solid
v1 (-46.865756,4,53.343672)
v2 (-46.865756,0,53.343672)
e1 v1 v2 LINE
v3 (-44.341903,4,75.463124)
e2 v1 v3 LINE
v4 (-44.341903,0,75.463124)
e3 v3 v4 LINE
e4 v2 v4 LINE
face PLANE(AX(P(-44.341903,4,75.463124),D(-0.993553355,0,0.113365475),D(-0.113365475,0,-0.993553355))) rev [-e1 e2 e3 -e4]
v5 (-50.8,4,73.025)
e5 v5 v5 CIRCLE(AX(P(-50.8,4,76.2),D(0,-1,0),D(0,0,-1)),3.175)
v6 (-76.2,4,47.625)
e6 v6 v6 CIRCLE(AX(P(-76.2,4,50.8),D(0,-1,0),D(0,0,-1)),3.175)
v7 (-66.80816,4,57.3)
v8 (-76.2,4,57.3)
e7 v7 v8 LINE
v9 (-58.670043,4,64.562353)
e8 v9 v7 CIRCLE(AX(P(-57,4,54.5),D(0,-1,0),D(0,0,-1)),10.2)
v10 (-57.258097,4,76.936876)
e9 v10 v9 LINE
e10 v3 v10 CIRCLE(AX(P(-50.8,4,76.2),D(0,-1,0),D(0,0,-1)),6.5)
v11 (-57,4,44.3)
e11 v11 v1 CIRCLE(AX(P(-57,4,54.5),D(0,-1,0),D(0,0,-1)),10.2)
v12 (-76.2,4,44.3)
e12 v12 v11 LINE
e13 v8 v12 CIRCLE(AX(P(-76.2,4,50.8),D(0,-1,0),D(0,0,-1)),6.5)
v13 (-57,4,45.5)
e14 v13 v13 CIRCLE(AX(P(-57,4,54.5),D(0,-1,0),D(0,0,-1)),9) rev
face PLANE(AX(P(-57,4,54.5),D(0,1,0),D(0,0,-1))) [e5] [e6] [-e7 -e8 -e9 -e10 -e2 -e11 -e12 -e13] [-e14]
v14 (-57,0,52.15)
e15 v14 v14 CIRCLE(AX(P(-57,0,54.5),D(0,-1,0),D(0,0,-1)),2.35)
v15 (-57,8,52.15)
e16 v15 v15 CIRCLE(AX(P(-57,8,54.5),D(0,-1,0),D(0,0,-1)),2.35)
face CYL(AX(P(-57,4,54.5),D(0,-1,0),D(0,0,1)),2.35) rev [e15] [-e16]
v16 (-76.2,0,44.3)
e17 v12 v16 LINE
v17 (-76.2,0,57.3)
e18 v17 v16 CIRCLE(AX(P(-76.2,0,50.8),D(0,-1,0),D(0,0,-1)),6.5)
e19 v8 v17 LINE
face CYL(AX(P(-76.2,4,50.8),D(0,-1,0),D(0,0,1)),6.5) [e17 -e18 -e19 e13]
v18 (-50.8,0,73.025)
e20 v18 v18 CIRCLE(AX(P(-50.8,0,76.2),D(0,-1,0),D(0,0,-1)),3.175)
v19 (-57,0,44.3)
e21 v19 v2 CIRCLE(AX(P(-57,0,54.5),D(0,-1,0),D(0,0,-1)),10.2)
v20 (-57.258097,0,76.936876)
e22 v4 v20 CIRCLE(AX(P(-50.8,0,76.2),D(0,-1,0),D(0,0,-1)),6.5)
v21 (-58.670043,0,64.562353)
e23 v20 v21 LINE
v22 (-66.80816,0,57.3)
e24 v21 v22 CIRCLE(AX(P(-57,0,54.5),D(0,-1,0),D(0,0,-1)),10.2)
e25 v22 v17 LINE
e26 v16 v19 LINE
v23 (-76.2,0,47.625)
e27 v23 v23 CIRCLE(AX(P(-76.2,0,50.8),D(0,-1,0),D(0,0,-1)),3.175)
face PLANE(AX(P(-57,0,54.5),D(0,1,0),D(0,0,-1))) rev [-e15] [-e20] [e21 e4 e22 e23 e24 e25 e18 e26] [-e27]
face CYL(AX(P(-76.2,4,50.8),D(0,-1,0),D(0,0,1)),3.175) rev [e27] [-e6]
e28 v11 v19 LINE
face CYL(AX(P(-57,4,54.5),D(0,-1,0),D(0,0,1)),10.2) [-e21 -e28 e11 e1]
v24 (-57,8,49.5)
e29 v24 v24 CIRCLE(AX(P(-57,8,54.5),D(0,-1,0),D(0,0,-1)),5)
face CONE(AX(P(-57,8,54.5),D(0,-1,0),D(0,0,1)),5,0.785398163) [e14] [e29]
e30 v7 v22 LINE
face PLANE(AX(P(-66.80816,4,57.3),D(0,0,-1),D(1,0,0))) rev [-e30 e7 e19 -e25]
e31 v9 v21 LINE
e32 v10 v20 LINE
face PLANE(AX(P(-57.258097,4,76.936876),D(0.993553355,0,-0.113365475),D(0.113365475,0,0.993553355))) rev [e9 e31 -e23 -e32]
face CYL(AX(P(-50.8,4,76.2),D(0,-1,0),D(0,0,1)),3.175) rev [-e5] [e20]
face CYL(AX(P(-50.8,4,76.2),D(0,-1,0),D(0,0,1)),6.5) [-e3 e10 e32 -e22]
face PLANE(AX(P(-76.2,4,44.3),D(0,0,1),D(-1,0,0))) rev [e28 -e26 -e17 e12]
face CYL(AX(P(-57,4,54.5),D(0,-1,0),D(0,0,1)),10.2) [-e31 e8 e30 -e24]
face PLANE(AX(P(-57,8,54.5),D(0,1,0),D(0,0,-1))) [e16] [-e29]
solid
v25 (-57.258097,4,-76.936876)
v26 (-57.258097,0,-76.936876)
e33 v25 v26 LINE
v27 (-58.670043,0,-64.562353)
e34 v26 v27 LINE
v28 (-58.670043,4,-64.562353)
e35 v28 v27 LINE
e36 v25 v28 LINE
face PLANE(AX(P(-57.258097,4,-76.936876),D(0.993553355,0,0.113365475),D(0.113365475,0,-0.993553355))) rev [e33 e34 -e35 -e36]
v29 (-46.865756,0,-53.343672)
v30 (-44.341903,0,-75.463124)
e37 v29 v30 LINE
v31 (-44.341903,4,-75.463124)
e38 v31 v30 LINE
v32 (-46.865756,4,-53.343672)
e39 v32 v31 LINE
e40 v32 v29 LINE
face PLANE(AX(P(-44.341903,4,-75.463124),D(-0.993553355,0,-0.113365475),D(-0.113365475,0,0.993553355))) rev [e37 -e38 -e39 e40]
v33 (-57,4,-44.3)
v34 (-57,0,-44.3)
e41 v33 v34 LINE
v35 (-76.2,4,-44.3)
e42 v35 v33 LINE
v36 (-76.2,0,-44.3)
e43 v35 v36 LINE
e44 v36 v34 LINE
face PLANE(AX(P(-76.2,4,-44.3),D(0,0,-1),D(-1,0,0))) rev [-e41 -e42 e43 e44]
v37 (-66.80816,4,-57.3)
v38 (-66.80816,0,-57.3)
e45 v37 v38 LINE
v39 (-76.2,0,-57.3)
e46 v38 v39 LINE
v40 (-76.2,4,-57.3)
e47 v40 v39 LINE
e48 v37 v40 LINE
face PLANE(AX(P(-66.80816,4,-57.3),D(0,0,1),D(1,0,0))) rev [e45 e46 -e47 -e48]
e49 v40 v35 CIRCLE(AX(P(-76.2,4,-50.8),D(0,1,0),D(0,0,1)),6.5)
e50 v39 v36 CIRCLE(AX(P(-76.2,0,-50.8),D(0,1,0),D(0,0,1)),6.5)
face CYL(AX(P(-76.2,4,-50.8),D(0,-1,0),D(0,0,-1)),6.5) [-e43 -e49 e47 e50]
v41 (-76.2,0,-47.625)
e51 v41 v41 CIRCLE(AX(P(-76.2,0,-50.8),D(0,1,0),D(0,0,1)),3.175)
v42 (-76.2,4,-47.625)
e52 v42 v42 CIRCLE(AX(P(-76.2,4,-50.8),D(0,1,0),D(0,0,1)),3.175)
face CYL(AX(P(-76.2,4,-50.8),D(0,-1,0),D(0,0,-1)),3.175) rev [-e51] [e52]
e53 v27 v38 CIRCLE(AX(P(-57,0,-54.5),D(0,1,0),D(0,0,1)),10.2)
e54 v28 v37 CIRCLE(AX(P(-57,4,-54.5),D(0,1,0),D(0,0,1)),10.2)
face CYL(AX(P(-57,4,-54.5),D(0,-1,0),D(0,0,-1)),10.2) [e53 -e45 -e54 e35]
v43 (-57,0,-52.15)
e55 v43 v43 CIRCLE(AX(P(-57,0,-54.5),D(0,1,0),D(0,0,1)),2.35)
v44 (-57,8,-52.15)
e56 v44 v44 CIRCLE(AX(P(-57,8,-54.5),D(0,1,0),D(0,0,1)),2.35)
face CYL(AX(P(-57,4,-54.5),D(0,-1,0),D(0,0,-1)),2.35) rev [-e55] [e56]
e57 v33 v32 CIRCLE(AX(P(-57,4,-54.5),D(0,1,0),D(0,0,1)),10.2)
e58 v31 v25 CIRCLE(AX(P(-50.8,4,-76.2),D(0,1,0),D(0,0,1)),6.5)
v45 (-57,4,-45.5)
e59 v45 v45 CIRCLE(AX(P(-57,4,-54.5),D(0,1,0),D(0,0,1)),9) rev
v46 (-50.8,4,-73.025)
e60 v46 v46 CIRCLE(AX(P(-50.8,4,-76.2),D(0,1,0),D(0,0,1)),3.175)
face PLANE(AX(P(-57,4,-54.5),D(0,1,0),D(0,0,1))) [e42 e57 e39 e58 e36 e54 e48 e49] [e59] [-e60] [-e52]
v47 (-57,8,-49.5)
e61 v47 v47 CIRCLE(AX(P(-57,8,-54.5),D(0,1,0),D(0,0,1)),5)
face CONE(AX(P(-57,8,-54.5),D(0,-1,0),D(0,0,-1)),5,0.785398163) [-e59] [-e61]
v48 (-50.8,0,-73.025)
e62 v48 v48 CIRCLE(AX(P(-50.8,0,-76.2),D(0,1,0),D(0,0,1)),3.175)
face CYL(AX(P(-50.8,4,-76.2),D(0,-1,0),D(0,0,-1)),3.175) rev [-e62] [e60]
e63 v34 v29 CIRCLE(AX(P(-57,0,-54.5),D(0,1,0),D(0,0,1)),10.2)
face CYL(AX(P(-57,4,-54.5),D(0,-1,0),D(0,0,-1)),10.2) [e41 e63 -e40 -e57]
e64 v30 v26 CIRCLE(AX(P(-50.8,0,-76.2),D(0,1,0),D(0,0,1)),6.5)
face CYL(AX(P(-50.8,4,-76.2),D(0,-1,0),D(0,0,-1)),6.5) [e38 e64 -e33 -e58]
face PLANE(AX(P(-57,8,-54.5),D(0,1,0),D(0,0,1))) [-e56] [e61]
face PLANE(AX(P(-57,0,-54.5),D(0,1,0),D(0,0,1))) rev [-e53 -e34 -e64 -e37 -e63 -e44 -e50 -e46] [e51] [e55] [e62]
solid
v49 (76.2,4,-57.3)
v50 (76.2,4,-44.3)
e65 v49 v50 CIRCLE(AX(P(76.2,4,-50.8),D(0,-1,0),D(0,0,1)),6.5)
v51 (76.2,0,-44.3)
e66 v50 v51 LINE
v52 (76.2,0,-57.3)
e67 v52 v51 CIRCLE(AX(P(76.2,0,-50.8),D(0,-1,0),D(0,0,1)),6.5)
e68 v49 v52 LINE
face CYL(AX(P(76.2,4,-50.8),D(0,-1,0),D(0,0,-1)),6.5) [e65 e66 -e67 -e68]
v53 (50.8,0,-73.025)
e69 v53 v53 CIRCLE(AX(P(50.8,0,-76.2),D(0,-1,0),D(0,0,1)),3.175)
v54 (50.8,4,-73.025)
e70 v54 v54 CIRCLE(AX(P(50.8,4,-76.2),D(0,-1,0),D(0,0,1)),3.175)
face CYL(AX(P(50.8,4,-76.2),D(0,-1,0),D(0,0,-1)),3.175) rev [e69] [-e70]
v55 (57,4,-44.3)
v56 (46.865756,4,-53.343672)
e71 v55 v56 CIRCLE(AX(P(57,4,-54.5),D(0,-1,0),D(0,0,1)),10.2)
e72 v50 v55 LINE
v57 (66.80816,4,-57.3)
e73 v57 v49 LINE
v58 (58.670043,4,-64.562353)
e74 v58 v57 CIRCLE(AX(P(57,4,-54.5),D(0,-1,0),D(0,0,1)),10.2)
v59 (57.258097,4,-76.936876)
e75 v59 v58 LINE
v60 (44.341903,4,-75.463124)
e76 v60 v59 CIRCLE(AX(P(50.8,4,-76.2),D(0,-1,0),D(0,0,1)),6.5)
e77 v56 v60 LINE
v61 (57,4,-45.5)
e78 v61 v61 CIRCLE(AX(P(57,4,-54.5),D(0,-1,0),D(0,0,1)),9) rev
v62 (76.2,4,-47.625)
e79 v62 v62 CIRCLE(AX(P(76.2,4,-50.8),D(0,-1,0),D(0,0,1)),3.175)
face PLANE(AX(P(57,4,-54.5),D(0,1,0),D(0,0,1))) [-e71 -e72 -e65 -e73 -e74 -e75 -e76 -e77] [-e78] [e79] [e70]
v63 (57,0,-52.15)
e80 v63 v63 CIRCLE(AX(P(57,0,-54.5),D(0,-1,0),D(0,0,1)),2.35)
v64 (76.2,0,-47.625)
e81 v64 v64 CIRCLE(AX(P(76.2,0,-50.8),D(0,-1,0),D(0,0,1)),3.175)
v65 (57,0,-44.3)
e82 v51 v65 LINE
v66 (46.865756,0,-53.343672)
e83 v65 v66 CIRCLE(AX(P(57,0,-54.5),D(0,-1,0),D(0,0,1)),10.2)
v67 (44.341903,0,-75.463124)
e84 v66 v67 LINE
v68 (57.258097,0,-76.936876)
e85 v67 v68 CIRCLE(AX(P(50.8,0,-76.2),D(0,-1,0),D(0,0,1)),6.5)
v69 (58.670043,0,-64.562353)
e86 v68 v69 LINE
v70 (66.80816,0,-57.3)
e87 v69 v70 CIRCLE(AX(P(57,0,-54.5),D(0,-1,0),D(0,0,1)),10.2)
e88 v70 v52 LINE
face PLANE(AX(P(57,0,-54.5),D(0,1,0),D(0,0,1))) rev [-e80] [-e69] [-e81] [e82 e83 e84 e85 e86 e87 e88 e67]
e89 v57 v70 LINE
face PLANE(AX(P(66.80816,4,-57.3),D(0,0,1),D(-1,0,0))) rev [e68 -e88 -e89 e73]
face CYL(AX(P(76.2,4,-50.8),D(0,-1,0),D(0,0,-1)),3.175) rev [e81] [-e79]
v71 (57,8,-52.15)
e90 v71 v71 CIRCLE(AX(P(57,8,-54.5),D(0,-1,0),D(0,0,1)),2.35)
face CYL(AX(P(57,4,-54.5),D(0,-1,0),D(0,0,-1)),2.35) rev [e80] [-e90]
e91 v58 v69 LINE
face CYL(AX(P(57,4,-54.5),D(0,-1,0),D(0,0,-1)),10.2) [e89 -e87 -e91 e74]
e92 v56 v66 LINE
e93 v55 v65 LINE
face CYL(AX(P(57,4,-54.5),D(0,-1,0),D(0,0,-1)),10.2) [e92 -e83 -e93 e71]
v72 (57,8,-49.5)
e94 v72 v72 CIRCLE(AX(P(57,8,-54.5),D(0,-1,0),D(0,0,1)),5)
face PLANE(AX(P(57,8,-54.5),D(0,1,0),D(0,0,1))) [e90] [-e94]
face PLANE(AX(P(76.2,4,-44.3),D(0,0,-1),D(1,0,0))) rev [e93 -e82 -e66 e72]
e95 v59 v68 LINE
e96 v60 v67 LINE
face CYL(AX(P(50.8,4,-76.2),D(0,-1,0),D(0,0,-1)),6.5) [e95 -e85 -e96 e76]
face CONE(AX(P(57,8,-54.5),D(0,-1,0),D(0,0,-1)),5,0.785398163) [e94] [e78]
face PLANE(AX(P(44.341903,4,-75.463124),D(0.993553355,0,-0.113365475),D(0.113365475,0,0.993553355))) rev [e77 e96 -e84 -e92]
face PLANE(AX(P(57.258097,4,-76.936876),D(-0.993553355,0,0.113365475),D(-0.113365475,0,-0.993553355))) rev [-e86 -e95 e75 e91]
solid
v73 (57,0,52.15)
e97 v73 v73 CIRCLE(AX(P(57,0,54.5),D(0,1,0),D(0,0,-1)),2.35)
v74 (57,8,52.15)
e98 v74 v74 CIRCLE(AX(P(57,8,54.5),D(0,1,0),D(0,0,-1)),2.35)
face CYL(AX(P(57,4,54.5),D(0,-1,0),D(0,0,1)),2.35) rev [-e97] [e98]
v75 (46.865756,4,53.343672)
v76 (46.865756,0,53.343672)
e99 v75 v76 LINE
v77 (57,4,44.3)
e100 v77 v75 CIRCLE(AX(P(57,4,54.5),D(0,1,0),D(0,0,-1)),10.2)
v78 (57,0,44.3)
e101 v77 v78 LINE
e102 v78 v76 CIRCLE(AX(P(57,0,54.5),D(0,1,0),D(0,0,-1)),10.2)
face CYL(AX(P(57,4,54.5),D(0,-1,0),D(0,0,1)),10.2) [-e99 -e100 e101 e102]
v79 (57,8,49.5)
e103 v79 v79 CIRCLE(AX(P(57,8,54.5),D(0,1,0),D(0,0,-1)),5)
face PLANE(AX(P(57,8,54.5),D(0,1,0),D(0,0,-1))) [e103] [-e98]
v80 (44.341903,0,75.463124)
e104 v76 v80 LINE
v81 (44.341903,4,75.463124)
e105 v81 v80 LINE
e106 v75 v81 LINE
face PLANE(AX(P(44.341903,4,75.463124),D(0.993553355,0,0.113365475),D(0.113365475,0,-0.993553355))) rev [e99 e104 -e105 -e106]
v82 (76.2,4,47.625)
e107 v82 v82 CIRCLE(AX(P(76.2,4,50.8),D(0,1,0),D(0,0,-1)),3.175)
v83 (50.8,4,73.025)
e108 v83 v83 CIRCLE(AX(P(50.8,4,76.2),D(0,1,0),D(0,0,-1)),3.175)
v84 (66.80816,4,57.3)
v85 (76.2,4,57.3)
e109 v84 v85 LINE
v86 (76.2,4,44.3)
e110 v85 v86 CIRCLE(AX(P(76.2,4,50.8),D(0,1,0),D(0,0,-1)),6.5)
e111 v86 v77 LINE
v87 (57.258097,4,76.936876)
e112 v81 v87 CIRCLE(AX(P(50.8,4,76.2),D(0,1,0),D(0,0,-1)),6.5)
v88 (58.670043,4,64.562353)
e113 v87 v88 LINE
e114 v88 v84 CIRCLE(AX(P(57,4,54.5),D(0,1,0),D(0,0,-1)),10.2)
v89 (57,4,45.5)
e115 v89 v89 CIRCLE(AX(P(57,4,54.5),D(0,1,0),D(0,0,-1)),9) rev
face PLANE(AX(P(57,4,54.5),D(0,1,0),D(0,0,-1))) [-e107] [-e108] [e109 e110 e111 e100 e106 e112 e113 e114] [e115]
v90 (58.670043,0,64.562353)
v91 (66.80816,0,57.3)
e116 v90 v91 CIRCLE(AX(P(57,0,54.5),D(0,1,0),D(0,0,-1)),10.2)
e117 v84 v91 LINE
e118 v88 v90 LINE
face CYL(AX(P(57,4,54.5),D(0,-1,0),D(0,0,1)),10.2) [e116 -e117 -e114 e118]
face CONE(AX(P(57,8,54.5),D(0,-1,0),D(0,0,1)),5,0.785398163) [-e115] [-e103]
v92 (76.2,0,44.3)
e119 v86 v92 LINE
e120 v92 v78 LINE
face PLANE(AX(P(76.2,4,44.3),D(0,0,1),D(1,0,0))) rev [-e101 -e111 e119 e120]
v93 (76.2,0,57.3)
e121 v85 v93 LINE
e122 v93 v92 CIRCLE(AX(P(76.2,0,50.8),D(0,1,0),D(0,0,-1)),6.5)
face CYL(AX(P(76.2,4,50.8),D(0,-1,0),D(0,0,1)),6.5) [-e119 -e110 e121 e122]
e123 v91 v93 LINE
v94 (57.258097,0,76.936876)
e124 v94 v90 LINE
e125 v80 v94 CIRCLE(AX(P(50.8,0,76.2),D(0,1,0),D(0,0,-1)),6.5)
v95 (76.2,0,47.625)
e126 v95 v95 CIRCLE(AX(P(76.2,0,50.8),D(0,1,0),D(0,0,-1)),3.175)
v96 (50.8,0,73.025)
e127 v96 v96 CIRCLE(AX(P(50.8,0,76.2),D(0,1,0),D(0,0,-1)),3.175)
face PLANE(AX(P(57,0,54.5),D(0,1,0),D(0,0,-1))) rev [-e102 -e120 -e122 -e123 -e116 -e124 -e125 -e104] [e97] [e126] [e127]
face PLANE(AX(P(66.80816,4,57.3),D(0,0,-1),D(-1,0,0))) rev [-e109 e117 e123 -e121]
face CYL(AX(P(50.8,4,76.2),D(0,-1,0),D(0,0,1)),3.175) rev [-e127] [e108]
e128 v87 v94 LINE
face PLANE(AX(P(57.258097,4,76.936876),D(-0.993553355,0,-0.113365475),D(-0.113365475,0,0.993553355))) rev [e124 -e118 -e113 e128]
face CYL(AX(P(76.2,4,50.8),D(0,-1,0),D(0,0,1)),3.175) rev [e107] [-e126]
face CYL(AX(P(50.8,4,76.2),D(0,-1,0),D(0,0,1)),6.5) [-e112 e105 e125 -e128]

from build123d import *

# Parameters (mm, degrees)
SKETCH3_R           = 2.35
SKETCH3_R_2         = 3.175
BOSS_EXTRUDE1_DEPTH = 4
SKETCH4_R           = 5
SKETCH4_R_2         = 2.35
BOSS_EXTRUDE2_DEPTH = 4
CHAMFER1_SIZE       = 4


with BuildPart() as part:
    # Sketch3 → Boss-Extrude1 (new body)
    with BuildSketch(Plane(origin=(0, 0, 0), x_dir=(1, 0, 0), z_dir=(0, 1, 0))):
        with BuildLine():
            Line((-66.808159868, 57.3), (-76.2, 57.3))
            ThreePointArc((-76.2, 57.3), (-82.7, 50.8), (-76.2, 44.3))
            Line((-76.2, 44.3), (-57, 44.3))
            ThreePointArc((-57, 44.3), (-50.208628415, 46.889660192), (-46.865755779, 53.343672158))
            Line((-46.865755779, 53.343672158), (-44.341903193, 75.463124415))
            ThreePointArc((-44.341903193, 75.463124415), (-50.063124415, 82.658096807), (-57.258096807, 76.936875585))
            Line((-57.258096807, 76.936875585), (-58.670042695, 64.562353472))
            ThreePointArc((-58.670042695, 64.562353472), (-63.791371585, 62.110339808), (-66.808159868, 57.3))
        make_face()
        with Locations(Location((-57, 54.5, 0), (0, 0, 270))):
            Circle(SKETCH3_R, mode=Mode.SUBTRACT)
        with Locations(Location((-50.8, 76.2, 0), (0, 0, 270))):
            Circle(SKETCH3_R_2, mode=Mode.SUBTRACT)
        with Locations(Location((-76.2, 50.8, 0), (0, 0, 270))):
            Circle(SKETCH3_R_2, mode=Mode.SUBTRACT)
    extrude(amount=BOSS_EXTRUDE1_DEPTH)

    # Sketch4 → Boss-Extrude2 (add)
    with BuildSketch(Plane(origin=(0, 4, 0), x_dir=(1, 0, 0), z_dir=(0, 1, 0))):
        with Locations(Location((-57, 54.5, 0), (0, 0, 270))):
            Circle(SKETCH4_R)
        with Locations(Location((-57, 54.5, 0), (0, 0, 270))):
            Circle(SKETCH4_R_2, mode=Mode.SUBTRACT)
    extrude(amount=BOSS_EXTRUDE2_DEPTH)

    # Chamfer1
    chamfer1_edges = [part.edges().sort_by_distance(p)[0] for p in [
        (-57, 4, -59.5),
    ]]
    chamfer(chamfer1_edges, length=CHAMFER1_SIZE - 0.0001)  # a hair under: the kernel refuses the full size


with BuildPart() as body_2:
    # Mirror2: mirrored copy
    add(part.part.mirror(Plane(origin=(0, 0, 0), x_dir=(0, 0, 1), z_dir=(1, 0, 0))))


with BuildPart() as body_3:
    # Mirror3: mirrored copy
    add(part.part.mirror(Plane.XY))


with BuildPart() as body_4:
    # Mirror3 2: mirrored copy
    add(body_2.part.mirror(Plane.XY))


solid = Compound([part.part, body_2.part, body_3.part, body_4.part])
